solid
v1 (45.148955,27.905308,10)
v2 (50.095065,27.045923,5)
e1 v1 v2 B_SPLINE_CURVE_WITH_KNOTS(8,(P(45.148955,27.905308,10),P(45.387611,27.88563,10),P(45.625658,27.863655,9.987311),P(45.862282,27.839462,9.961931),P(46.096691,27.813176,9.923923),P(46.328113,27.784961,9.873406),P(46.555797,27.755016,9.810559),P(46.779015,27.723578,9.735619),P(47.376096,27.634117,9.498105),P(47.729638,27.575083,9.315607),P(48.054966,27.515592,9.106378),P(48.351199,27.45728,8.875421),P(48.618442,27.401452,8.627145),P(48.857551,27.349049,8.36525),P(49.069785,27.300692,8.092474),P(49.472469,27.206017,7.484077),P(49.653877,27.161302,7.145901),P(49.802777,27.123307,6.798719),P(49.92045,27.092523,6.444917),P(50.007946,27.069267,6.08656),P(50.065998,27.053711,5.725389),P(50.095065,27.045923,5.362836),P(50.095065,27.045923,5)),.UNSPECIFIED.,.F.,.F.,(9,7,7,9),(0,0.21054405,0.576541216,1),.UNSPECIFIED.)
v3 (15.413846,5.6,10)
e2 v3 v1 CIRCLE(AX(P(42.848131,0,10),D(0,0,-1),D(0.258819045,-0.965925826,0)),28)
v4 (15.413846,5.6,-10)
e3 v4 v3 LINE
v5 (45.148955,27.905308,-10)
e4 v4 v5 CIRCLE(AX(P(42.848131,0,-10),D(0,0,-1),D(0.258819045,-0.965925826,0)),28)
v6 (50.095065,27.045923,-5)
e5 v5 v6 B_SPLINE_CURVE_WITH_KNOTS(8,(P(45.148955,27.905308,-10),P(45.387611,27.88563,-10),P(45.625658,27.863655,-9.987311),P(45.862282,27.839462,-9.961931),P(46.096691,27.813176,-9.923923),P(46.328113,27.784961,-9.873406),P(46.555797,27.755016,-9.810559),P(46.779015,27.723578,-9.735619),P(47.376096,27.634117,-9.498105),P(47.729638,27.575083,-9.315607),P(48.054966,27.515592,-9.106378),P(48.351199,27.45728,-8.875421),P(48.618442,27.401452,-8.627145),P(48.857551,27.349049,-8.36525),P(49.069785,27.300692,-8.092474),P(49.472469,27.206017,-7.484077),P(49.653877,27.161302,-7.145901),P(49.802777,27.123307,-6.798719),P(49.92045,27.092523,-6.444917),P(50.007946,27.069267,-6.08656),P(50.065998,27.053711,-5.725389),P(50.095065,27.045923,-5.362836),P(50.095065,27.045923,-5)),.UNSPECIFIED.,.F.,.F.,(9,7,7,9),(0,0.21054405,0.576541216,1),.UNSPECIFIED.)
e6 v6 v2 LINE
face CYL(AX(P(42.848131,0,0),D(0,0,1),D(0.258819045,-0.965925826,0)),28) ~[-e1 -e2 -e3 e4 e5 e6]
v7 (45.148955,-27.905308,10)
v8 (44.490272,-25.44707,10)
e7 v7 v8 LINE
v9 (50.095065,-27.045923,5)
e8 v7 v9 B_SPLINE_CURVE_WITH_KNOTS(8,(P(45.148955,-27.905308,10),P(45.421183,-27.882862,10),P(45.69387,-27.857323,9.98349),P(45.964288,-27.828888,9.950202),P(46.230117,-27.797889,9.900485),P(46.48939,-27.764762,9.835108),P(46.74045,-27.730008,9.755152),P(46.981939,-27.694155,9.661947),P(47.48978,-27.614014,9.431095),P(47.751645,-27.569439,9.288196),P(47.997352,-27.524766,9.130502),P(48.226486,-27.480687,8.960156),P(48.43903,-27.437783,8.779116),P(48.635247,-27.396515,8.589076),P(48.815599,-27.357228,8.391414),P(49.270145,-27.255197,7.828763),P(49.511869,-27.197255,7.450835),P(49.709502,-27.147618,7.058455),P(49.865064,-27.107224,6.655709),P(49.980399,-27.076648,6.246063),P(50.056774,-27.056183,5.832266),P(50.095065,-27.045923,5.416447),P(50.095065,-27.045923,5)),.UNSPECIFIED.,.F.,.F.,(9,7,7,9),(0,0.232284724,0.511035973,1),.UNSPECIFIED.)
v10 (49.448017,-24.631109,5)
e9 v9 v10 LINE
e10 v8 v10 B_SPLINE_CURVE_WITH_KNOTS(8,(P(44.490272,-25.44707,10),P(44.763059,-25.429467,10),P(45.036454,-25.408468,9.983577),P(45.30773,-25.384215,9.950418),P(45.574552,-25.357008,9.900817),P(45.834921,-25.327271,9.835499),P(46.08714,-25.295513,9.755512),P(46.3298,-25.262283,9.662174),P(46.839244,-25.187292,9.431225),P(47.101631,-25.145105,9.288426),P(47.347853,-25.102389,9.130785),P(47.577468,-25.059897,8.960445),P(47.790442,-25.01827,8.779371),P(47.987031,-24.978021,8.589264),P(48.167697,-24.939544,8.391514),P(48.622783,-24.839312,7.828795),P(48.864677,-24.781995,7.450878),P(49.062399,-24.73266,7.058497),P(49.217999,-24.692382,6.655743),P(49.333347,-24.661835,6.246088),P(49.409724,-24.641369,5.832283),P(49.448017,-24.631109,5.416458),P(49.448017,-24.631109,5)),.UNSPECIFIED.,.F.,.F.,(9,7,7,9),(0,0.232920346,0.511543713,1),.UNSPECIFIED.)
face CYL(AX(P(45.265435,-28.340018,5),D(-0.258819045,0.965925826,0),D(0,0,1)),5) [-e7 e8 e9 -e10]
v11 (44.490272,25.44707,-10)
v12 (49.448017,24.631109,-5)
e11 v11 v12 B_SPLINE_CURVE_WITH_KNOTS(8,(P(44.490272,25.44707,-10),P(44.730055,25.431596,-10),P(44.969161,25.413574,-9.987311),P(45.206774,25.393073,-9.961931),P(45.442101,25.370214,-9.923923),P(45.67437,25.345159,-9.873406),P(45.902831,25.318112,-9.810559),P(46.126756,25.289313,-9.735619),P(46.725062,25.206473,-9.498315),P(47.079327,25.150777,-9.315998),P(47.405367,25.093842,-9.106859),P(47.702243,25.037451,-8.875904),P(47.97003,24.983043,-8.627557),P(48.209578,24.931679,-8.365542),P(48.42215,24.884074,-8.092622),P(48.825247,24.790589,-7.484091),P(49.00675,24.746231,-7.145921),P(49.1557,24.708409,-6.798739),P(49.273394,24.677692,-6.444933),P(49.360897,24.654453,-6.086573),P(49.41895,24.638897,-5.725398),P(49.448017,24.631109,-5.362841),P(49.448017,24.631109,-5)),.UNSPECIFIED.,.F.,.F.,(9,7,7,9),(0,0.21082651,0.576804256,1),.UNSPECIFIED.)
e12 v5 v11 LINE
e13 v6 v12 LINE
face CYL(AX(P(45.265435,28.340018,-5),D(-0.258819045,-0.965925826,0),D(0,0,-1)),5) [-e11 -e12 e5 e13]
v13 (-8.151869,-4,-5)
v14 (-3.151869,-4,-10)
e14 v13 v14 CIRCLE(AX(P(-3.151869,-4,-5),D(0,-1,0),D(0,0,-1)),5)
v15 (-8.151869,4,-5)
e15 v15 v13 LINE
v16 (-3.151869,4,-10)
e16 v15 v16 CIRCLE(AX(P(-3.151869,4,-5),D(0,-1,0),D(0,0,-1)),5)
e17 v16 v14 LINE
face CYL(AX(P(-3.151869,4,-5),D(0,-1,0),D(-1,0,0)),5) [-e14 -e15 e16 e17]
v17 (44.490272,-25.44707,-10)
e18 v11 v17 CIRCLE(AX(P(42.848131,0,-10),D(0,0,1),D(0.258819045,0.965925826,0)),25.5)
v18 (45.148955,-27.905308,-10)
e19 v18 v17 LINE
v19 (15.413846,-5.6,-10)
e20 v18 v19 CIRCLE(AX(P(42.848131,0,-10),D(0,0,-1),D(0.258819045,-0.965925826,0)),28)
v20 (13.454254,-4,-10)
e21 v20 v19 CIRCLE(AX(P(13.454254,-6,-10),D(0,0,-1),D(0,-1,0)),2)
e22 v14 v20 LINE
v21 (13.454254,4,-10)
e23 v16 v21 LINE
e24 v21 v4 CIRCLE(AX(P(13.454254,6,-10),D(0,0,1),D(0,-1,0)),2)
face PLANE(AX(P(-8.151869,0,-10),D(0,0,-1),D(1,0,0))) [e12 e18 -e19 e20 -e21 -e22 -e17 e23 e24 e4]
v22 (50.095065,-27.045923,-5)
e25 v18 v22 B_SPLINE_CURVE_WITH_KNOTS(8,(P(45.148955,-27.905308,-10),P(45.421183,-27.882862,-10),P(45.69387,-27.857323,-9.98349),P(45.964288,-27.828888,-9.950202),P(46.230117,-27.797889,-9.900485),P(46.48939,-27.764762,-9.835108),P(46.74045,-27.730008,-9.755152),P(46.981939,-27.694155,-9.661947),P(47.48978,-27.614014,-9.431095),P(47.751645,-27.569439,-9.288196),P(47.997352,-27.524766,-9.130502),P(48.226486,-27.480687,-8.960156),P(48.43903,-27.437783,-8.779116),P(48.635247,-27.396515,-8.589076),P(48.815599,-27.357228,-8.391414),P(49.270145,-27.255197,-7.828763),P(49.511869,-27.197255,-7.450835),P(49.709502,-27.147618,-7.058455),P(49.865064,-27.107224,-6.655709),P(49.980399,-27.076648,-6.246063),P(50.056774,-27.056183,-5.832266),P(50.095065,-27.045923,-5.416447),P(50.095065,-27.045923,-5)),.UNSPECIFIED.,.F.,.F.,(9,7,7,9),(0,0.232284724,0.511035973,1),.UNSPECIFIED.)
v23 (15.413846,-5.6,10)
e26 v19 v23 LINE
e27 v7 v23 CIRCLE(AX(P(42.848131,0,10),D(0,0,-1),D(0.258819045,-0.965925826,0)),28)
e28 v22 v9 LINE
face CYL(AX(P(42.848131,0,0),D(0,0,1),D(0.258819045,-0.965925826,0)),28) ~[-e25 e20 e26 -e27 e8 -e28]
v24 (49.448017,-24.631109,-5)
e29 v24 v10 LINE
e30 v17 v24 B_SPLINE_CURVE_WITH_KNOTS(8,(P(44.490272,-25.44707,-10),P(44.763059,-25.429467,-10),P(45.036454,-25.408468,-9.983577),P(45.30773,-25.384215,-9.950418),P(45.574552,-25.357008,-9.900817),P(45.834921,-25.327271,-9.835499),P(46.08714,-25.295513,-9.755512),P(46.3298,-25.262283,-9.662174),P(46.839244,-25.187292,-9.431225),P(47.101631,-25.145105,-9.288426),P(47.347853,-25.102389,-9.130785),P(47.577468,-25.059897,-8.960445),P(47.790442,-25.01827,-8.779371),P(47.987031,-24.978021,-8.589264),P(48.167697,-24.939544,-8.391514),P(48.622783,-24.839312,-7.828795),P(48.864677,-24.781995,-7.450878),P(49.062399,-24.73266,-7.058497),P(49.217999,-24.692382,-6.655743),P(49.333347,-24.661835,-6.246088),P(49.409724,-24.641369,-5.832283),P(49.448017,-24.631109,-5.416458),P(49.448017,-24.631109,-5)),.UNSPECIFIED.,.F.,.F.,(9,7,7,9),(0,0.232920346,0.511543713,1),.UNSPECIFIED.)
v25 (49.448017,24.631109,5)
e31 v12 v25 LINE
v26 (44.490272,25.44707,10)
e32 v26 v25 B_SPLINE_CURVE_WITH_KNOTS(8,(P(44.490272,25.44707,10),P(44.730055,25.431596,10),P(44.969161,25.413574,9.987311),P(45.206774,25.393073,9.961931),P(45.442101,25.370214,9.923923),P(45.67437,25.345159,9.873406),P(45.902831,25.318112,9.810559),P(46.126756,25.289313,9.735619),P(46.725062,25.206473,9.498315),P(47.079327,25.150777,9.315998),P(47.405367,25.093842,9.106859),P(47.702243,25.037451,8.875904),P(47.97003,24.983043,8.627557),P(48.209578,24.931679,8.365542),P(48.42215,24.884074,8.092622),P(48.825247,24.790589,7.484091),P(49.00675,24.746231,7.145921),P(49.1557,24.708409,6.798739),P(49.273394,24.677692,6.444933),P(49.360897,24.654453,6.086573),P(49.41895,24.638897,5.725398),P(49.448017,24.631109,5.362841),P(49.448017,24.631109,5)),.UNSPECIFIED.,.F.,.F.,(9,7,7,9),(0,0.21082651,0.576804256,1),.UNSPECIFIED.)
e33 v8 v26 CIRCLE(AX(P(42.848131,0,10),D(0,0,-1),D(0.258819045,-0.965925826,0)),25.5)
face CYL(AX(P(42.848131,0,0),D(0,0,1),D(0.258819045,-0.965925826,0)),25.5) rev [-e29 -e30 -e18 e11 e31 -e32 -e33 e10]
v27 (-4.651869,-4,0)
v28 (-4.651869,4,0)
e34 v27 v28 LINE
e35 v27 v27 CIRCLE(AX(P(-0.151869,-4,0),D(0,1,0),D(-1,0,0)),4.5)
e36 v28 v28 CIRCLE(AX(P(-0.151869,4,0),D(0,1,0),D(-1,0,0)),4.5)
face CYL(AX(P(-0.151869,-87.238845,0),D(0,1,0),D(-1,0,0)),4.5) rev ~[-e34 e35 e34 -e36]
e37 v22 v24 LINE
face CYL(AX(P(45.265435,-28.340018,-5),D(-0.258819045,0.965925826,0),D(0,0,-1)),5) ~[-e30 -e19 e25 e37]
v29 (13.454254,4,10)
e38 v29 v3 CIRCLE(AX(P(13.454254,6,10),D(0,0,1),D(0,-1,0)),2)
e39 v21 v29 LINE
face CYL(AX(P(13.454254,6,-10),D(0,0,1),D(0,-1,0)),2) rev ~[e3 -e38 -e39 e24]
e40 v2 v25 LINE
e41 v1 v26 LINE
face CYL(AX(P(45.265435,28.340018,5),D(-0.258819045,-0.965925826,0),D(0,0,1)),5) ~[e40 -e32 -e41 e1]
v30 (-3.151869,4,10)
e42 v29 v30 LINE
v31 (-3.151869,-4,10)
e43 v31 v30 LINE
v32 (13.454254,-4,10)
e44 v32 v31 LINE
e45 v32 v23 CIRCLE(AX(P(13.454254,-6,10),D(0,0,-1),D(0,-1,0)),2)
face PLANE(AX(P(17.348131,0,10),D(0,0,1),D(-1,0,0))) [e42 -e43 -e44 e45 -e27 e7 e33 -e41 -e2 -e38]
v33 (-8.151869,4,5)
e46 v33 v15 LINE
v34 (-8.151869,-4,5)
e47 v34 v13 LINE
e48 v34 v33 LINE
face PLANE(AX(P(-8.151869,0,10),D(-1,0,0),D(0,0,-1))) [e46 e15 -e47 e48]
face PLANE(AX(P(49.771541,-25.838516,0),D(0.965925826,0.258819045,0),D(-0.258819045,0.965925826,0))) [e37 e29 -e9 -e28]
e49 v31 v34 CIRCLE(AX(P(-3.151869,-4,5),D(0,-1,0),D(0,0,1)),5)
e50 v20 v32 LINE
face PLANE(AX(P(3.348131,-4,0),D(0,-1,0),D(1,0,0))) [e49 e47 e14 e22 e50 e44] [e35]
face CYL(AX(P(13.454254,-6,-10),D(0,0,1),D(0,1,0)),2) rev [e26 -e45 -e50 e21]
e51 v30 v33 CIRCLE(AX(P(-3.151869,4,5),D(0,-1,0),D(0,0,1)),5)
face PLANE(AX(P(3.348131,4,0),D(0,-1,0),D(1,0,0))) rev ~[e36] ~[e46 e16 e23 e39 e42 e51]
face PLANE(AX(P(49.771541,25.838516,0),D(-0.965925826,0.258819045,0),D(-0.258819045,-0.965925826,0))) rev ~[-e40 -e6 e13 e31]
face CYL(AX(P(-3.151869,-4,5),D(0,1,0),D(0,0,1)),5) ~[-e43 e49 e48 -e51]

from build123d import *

# Parameters (mm, degrees)
F0_W          = 2.5
F0_H          = 20
F1_ANGLE_BACK = 105
F1_ANGLE      = 210
F2_DEPTH      = 4
F4_D          = 9
F5_R          = 2
F6_R          = 5
F7_R          = 5


# Not quite as in the source:
# - a feature names something its author has since deleted; it is built from what else it names


with BuildPart() as f1:
    # F0 (on Front) → F1 (revolve)
    with BuildSketch(Plane.XZ, mode=Mode.PRIVATE) as f1_sk:
        with Locations((16.0981313139, 0)):
            Rectangle(F0_W, F0_H)
    revolve(f1_sk.sketch.rotate(Axis((42.8481313139, 0, -3.3182863891), (0, 0, -1)), -F1_ANGLE_BACK), axis=Axis((42.8481313139, 0, -3.3182863891), (0, 0, -1)), revolution_arc=F1_ANGLE)

    # F0 (on Front) → F2 (join, symmetric)
    with BuildSketch(Plane.XZ):
        Polygon((14.8481313139, -10), (14.8481313139, 10), (-0.1518686861, 10), (-8.1518686861, 10), (-8.1518686861, -1.747650138), (-8.1518686861, -10), (-0.1518686861, -10), align=None)
        with Locations((16.0981313139, 0)):
            Rectangle(F0_W, F0_H)
    extrude(amount=F2_DEPTH, both=True)

    # F4 (through all)
    with Locations(Plane.XZ.offset(4)):
        with Locations((-0.1518686861, 0)):
            Hole(F4_D / 2)

    # F5
    f5_edges = [f1.edges().sort_by_distance(p)[0] for p in [
        (15.135318, -4, 0),
        (15.135318, 4, 0),
    ]]
    fillet(f5_edges, radius=F5_R)

    # F6
    f6_edges = [f1.edges().sort_by_distance(p)[0] for p in [
        (49.771541, -25.838516, 10),
        (49.771541, -25.838516, -10),
        (49.771541, 25.838516, -10),
        (49.771541, 25.838516, 10),
    ]]
    fillet(f6_edges, radius=F6_R)

    # F7
    f7_edges = [f1.edges().sort_by_distance(p)[0] for p in [
        (-8.151869, 0, 10),
        (-8.151869, 0, -10),
    ]]
    fillet(f7_edges, radius=F7_R)


solid = f1.part
